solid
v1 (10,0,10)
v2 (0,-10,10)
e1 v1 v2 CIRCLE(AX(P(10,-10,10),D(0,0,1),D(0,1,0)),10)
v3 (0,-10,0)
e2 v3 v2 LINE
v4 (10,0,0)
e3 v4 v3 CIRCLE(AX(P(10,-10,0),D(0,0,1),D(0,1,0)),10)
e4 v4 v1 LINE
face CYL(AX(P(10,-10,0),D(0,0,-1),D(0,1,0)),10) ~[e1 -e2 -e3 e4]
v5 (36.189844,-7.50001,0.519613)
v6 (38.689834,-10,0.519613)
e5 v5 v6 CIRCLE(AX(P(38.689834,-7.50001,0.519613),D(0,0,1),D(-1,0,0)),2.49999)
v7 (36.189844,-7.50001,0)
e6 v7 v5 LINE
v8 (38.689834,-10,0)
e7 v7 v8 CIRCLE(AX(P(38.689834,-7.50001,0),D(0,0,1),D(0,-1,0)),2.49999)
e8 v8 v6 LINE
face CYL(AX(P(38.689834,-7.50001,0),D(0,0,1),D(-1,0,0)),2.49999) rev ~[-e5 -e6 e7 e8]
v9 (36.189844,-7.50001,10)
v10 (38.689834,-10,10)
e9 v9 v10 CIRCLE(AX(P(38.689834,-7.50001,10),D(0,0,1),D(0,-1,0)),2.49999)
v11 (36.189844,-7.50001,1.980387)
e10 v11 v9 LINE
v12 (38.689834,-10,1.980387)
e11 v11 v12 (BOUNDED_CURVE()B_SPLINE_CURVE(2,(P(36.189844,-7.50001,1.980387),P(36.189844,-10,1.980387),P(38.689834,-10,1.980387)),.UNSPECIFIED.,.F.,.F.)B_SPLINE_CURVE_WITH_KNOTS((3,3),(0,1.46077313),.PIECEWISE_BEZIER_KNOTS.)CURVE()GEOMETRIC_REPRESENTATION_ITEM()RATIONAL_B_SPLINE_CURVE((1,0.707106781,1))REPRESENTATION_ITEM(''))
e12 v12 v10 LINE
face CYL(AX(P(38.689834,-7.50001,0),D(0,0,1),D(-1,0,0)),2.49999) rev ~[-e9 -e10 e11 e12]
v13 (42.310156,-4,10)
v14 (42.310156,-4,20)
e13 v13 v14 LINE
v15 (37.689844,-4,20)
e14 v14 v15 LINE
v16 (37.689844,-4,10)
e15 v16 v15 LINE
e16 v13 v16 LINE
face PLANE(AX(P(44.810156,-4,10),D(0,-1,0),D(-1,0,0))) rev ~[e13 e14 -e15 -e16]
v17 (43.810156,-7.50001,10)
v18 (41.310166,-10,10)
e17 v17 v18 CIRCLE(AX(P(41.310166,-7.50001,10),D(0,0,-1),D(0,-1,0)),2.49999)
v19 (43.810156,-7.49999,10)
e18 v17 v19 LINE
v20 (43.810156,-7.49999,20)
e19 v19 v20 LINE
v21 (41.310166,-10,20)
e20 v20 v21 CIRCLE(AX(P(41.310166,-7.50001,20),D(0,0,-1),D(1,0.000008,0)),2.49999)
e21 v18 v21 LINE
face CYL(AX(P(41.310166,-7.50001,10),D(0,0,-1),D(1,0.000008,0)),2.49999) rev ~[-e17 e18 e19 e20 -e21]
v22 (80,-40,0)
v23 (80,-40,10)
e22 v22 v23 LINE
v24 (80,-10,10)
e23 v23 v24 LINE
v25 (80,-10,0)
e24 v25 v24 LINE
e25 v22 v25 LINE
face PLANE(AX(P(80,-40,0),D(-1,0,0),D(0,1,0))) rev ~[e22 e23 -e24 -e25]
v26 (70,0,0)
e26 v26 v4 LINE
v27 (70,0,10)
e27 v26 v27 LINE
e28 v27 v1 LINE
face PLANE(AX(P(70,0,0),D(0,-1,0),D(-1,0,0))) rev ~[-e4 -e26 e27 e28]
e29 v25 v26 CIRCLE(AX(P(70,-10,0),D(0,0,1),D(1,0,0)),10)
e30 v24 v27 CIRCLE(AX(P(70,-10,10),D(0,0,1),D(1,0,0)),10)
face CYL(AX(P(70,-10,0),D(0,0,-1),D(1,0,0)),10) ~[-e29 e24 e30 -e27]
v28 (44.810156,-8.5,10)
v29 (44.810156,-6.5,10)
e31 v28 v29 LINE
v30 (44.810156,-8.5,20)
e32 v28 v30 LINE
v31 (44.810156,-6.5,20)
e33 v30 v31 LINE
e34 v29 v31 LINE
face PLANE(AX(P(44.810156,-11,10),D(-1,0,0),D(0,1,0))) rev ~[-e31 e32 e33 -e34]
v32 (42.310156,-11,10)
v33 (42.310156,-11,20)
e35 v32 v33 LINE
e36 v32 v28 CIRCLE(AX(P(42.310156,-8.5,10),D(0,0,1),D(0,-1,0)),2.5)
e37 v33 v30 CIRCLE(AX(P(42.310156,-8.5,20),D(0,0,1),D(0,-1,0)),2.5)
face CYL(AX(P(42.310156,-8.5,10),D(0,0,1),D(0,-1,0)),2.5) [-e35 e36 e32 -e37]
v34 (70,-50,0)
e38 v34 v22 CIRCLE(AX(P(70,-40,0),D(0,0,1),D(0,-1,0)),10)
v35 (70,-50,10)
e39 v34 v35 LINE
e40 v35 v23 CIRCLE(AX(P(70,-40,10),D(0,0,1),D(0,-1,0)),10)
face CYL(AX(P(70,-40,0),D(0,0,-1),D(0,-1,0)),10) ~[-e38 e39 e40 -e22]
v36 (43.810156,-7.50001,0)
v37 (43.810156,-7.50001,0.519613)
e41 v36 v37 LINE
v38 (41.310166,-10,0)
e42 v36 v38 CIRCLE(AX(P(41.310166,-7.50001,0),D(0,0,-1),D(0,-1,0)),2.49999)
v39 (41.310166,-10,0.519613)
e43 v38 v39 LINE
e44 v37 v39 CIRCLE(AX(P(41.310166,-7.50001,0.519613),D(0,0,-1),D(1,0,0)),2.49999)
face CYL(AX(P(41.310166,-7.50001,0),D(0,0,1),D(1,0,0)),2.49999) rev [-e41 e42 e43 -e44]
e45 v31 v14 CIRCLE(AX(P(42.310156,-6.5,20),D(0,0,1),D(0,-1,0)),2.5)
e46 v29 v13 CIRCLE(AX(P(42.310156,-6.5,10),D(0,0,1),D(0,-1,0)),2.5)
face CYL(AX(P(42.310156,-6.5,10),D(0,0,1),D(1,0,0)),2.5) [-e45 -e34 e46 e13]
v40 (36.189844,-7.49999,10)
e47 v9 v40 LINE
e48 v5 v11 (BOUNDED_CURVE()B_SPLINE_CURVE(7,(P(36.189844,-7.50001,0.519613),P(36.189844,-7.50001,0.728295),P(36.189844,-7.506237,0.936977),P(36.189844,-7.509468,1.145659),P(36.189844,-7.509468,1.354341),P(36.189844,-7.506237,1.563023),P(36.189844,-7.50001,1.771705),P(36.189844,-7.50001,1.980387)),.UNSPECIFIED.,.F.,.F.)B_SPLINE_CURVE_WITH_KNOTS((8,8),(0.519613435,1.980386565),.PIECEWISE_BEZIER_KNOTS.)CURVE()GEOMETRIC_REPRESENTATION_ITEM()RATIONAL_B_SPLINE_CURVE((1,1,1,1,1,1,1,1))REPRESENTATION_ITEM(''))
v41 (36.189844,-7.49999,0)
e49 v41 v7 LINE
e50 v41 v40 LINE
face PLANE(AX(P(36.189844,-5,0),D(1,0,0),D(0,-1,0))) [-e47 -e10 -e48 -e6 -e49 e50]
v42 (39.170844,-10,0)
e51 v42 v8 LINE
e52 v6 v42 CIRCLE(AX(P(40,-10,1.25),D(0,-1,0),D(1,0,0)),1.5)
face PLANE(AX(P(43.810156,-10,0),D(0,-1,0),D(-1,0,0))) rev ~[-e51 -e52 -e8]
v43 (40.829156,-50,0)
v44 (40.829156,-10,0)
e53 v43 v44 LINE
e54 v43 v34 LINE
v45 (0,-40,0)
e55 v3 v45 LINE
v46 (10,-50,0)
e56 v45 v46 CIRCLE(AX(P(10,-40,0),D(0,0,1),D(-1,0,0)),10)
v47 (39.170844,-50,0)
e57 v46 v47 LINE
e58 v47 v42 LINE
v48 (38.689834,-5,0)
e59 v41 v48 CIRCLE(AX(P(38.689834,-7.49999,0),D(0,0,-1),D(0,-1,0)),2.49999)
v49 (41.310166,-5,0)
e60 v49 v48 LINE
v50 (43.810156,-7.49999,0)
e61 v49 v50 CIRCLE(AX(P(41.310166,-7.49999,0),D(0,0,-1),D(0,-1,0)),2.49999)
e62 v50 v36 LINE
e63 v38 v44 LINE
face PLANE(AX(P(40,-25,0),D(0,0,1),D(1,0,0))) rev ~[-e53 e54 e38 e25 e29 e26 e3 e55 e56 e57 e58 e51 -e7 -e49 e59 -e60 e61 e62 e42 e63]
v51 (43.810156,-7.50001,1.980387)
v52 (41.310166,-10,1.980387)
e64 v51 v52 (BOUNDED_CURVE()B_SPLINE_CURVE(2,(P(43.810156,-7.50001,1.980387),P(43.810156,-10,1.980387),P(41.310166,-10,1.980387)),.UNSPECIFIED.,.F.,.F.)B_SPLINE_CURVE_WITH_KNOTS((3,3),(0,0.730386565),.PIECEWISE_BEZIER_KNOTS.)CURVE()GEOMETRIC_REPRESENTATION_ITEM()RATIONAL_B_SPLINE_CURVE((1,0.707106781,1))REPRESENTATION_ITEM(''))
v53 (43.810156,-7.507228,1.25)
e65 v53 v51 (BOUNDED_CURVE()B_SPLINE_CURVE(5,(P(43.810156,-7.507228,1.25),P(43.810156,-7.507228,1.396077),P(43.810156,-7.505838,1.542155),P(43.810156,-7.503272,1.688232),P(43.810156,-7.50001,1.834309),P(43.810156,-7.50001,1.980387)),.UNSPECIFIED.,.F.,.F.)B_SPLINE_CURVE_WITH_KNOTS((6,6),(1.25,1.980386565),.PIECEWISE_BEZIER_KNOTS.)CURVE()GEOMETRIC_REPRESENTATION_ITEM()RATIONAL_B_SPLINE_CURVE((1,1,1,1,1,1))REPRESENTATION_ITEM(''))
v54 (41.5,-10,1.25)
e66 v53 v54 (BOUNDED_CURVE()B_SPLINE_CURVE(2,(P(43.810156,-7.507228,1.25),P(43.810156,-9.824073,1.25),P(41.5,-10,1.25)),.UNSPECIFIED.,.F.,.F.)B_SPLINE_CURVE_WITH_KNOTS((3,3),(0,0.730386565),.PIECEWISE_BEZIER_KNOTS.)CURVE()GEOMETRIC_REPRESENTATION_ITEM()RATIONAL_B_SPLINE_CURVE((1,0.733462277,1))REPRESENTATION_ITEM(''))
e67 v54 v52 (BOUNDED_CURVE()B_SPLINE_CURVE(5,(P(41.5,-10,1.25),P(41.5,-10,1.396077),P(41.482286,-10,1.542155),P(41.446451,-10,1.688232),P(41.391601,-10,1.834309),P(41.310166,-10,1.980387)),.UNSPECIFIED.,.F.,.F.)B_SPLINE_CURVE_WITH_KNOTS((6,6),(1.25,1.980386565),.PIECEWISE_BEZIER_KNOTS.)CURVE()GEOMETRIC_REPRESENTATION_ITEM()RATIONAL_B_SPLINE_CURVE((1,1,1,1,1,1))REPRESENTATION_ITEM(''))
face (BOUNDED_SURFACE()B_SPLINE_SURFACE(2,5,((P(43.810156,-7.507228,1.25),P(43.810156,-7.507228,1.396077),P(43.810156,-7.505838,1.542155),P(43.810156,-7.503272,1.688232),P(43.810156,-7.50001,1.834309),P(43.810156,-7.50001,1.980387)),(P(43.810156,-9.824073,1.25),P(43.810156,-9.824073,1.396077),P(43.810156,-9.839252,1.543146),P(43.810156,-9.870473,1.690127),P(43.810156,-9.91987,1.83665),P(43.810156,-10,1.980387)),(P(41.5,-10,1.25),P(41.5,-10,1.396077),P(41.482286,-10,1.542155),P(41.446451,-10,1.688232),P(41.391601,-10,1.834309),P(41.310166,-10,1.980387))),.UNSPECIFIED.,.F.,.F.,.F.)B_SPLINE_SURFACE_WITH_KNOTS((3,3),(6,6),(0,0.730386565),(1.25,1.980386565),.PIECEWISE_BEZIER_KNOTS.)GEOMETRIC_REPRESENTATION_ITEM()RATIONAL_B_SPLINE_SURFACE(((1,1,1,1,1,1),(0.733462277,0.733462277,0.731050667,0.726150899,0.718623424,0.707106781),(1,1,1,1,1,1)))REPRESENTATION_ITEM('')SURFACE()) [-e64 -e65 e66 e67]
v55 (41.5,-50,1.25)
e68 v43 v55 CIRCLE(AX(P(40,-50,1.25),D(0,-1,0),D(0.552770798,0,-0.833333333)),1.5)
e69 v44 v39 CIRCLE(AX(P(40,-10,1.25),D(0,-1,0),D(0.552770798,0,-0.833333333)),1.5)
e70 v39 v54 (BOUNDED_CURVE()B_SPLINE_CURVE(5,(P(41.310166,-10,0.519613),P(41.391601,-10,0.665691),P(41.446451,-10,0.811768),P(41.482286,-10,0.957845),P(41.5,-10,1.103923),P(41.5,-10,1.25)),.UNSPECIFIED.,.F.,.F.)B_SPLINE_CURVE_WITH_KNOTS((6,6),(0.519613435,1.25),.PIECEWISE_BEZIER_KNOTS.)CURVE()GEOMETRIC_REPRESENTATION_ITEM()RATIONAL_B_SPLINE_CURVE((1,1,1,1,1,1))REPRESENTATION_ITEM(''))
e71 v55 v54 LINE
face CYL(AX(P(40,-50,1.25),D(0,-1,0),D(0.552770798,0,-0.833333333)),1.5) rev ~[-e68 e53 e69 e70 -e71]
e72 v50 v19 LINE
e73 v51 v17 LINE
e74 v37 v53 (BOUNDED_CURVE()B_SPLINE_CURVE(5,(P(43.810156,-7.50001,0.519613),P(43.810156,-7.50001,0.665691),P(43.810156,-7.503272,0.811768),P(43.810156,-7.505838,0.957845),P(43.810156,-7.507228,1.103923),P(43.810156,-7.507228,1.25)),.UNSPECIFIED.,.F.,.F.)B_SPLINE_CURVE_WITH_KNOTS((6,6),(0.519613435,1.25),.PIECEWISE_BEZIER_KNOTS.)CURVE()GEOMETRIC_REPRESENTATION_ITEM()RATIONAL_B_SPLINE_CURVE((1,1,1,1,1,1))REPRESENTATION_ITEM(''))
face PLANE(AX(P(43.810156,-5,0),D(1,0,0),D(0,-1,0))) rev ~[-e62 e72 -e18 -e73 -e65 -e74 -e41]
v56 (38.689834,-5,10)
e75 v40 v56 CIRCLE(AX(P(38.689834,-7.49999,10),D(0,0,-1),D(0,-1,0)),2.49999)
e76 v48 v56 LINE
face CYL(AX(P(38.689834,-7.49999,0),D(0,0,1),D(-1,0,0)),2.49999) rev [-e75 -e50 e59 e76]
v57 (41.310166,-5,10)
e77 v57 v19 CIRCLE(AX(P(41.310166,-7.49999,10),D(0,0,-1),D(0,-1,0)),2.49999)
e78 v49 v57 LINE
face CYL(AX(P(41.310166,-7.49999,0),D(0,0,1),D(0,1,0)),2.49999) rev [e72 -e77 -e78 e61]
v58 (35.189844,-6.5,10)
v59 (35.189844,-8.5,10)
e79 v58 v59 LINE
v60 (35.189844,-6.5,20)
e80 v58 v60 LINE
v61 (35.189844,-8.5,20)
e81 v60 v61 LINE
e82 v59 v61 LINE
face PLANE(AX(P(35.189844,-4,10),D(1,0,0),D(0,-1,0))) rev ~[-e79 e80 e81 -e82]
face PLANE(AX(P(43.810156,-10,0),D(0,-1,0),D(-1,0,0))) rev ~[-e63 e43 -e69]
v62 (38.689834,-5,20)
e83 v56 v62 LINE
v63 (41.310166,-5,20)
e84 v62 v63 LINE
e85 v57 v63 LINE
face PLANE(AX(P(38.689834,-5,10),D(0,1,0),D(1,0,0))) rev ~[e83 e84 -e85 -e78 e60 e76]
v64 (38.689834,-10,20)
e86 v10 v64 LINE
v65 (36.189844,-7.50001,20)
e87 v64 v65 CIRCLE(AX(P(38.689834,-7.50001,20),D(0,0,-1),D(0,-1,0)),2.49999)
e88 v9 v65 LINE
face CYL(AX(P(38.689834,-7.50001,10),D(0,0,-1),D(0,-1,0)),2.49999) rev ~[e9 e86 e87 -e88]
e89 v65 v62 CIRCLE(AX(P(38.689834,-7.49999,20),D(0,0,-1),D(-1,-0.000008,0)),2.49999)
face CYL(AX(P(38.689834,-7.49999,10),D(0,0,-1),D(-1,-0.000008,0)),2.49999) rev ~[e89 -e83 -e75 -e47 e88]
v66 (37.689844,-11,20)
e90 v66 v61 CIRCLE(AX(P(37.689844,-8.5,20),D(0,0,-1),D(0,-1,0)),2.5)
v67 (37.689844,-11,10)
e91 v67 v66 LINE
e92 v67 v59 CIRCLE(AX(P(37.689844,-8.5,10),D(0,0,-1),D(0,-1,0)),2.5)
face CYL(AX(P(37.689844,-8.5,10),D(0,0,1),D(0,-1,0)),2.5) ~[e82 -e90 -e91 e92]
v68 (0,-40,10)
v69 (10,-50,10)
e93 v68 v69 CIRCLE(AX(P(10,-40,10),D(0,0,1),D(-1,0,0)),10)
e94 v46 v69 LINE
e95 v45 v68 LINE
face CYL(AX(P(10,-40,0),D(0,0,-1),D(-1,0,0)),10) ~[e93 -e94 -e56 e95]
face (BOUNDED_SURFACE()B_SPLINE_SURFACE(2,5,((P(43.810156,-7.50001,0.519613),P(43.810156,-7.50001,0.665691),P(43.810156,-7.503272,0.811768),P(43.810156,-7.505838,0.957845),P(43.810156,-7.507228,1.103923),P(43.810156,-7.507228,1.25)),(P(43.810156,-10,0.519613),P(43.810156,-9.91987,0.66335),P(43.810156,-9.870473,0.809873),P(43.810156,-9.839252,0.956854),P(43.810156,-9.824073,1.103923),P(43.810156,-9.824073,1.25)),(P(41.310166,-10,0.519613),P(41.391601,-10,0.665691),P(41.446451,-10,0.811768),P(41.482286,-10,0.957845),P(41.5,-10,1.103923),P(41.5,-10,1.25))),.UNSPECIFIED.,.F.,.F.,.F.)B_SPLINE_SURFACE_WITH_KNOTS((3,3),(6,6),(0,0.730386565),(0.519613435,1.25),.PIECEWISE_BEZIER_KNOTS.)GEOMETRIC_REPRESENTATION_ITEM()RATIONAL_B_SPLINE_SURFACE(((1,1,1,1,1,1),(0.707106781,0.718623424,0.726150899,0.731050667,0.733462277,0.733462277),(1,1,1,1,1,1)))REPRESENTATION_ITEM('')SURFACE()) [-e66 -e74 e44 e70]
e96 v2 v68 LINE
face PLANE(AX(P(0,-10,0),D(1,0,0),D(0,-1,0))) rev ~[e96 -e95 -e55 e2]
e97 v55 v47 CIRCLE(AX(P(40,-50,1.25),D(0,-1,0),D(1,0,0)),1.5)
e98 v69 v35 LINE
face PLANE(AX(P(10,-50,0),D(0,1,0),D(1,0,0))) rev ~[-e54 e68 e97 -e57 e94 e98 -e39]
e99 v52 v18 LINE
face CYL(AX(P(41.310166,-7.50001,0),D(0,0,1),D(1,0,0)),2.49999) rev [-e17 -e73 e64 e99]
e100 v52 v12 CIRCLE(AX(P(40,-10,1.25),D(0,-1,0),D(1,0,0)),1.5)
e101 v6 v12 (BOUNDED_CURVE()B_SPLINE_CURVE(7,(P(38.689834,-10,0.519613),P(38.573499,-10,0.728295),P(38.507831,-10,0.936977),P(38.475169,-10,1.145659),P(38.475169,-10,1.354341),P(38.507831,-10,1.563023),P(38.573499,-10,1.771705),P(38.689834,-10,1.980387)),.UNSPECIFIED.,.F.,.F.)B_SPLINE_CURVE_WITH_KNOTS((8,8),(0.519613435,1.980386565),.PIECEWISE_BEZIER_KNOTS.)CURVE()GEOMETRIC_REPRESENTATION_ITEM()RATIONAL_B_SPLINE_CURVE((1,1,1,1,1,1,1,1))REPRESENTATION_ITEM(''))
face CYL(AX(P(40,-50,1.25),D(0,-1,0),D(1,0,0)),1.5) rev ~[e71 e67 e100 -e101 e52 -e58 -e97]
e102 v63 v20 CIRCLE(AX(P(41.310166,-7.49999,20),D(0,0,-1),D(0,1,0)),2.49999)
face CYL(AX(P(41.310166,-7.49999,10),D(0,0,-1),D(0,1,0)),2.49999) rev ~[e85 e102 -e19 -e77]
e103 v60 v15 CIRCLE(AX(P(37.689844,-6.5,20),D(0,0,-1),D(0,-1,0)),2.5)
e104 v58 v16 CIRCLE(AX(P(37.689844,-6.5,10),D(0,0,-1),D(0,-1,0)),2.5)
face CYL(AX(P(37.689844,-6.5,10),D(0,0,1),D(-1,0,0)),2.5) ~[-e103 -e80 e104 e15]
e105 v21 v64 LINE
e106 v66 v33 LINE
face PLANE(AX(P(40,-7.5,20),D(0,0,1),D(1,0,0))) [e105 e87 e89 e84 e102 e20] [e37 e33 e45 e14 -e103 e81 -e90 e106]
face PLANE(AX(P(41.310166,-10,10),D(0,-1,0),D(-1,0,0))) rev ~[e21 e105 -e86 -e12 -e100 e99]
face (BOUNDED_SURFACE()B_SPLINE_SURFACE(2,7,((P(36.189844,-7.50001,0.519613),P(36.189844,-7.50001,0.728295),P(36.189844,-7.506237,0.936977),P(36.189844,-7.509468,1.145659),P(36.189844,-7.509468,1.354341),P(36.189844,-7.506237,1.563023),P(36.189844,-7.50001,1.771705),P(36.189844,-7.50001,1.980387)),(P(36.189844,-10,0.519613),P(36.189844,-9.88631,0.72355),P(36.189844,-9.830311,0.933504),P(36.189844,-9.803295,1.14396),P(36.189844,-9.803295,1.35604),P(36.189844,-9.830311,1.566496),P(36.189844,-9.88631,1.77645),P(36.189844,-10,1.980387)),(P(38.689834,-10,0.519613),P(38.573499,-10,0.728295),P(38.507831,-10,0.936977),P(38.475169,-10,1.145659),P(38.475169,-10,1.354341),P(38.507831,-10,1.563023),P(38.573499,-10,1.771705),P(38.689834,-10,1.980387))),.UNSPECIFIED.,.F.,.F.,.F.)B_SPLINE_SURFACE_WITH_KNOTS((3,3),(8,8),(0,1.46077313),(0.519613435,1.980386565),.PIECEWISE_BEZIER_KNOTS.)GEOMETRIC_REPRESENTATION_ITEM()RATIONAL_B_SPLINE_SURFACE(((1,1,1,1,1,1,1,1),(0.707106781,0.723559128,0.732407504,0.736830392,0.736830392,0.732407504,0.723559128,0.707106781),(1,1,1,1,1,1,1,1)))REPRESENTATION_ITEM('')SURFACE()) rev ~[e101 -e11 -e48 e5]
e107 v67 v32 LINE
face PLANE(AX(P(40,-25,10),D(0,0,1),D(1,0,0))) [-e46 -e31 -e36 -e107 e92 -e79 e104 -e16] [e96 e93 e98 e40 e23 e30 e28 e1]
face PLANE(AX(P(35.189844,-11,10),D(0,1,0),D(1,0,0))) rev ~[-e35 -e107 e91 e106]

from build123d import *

# Parameters (mm, degrees)
F1_DEPTH = 10
F3_DEPTH = 45
F4_W     = 2.981
F4_H     = 5
F4_W_2   = 1.6583123952
F5_DEPTH = 25
F6_R     = 2.49999
F8_DEPTH = 10
F9_R     = 2.5


# Not quite as in the source:
# - a fillet or chamfer is up to 0.001 mm smaller than in the source, because OpenCascade refuses the exact size
# - ends of sketch curves that miss each other by under 0.0002 mm in the source are joined


with BuildPart() as f1:
    # F0 (on Top) → F1 (new body)
    with BuildSketch(Plane.XY):
        with BuildLine():
            Line((70, 0), (10, 0))
            ThreePointArc((10, 0), (2.9289321881, -2.9289321881), (0, -10))
            Line((0, -10), (0, -40))
            ThreePointArc((0, -40), (2.9289321881, -47.0710678119), (10, -50))
            Line((10, -50), (70, -50))
            ThreePointArc((70, -50), (77.0710678119, -47.0710678119), (80, -40))
            Line((80, -40), (80, -10))
            ThreePointArc((80, -10), (77.0710678119, -2.9289321881), (70, 0))
        make_face()
    extrude(amount=F1_DEPTH)

    # F2 (on face) → F3 (cut)
    with BuildSketch(Plane.XZ.offset(50)):
        with BuildLine():
            ThreePointArc((40.8291561976, 0), (41.3216910184, 0.5406814173), (41.5, 1.25))
            ThreePointArc((41.5, 1.25), (39.2906814173, 2.5716910184), (39.1708438024, 0))
            Line((39.1708438024, 0), (40.8291561976, 0))
        make_face()
    extrude(amount=-F3_DEPTH, mode=Mode.SUBTRACT)

    # F4 (on face) → F5 (cut)
    with BuildSketch(Plane(origin=(0, 0, 0), x_dir=(1, 0, 0), z_dir=(0, 0, -1))):
        with Locations((37.6803438024, 7.5)):
            Rectangle(F4_W, F4_H)
        with Locations((40, 7.5)):
            Rectangle(F4_W_2, F4_H)
        with Locations((42.3196561976, 7.5)):
            Rectangle(F4_W, F4_H)
    extrude(amount=-F5_DEPTH, mode=Mode.SUBTRACT)

    # F6 (radius 2.5 in the source; OpenCascade refuses exactly that, so slightly less here)
    f6_edges = [f1.edges().sort_by_distance(p)[0] for p in [
        (36.189844, -5, 5),
        (43.810156, -5, 5),
        (43.810156, -10, 5),
        (36.189844, -10, 5),
    ]]
    fillet(f6_edges, radius=F6_R)

    # F7 (on face) → F8 (join)
    with BuildSketch(Plane.XY.offset(10)):
        Polygon((35.1898438024, -11), (40, -11), (44.8101561976, -11), (44.8101561976, -4), (35.1898438024, -4), align=None)
        with BuildLine():
            ThreePointArc((38.6898338024, -10), (36.9220739205, -9.2677698819), (36.1898438024, -7.50001))
            ThreePointArc((36.1898438024, -7.50001), (36.9220739205, -5.7322301181), (38.6898338024, -5))
            Line((38.6898338024, -5), (41.3101661976, -5))
            ThreePointArc((41.3101661976, -5), (43.0779260795, -5.7322301181), (43.8101561976, -7.49999))
            ThreePointArc((43.8101561976, -7.49999), (43.0779260795, -9.2677698819), (41.3101661976, -10))
            Line((41.3101661976, -10), (38.6898338024, -10))
        make_face(mode=Mode.SUBTRACT)
    extrude(amount=F8_DEPTH)

    # F9
    f9_edges = [f1.edges().sort_by_distance(p)[0] for p in [
        (44.810156, -4, 15),
        (35.189844, -4, 15),
        (35.189844, -11, 15),
        (44.810156, -11, 15),
    ]]
    fillet(f9_edges, radius=F9_R)


solid = f1.part
